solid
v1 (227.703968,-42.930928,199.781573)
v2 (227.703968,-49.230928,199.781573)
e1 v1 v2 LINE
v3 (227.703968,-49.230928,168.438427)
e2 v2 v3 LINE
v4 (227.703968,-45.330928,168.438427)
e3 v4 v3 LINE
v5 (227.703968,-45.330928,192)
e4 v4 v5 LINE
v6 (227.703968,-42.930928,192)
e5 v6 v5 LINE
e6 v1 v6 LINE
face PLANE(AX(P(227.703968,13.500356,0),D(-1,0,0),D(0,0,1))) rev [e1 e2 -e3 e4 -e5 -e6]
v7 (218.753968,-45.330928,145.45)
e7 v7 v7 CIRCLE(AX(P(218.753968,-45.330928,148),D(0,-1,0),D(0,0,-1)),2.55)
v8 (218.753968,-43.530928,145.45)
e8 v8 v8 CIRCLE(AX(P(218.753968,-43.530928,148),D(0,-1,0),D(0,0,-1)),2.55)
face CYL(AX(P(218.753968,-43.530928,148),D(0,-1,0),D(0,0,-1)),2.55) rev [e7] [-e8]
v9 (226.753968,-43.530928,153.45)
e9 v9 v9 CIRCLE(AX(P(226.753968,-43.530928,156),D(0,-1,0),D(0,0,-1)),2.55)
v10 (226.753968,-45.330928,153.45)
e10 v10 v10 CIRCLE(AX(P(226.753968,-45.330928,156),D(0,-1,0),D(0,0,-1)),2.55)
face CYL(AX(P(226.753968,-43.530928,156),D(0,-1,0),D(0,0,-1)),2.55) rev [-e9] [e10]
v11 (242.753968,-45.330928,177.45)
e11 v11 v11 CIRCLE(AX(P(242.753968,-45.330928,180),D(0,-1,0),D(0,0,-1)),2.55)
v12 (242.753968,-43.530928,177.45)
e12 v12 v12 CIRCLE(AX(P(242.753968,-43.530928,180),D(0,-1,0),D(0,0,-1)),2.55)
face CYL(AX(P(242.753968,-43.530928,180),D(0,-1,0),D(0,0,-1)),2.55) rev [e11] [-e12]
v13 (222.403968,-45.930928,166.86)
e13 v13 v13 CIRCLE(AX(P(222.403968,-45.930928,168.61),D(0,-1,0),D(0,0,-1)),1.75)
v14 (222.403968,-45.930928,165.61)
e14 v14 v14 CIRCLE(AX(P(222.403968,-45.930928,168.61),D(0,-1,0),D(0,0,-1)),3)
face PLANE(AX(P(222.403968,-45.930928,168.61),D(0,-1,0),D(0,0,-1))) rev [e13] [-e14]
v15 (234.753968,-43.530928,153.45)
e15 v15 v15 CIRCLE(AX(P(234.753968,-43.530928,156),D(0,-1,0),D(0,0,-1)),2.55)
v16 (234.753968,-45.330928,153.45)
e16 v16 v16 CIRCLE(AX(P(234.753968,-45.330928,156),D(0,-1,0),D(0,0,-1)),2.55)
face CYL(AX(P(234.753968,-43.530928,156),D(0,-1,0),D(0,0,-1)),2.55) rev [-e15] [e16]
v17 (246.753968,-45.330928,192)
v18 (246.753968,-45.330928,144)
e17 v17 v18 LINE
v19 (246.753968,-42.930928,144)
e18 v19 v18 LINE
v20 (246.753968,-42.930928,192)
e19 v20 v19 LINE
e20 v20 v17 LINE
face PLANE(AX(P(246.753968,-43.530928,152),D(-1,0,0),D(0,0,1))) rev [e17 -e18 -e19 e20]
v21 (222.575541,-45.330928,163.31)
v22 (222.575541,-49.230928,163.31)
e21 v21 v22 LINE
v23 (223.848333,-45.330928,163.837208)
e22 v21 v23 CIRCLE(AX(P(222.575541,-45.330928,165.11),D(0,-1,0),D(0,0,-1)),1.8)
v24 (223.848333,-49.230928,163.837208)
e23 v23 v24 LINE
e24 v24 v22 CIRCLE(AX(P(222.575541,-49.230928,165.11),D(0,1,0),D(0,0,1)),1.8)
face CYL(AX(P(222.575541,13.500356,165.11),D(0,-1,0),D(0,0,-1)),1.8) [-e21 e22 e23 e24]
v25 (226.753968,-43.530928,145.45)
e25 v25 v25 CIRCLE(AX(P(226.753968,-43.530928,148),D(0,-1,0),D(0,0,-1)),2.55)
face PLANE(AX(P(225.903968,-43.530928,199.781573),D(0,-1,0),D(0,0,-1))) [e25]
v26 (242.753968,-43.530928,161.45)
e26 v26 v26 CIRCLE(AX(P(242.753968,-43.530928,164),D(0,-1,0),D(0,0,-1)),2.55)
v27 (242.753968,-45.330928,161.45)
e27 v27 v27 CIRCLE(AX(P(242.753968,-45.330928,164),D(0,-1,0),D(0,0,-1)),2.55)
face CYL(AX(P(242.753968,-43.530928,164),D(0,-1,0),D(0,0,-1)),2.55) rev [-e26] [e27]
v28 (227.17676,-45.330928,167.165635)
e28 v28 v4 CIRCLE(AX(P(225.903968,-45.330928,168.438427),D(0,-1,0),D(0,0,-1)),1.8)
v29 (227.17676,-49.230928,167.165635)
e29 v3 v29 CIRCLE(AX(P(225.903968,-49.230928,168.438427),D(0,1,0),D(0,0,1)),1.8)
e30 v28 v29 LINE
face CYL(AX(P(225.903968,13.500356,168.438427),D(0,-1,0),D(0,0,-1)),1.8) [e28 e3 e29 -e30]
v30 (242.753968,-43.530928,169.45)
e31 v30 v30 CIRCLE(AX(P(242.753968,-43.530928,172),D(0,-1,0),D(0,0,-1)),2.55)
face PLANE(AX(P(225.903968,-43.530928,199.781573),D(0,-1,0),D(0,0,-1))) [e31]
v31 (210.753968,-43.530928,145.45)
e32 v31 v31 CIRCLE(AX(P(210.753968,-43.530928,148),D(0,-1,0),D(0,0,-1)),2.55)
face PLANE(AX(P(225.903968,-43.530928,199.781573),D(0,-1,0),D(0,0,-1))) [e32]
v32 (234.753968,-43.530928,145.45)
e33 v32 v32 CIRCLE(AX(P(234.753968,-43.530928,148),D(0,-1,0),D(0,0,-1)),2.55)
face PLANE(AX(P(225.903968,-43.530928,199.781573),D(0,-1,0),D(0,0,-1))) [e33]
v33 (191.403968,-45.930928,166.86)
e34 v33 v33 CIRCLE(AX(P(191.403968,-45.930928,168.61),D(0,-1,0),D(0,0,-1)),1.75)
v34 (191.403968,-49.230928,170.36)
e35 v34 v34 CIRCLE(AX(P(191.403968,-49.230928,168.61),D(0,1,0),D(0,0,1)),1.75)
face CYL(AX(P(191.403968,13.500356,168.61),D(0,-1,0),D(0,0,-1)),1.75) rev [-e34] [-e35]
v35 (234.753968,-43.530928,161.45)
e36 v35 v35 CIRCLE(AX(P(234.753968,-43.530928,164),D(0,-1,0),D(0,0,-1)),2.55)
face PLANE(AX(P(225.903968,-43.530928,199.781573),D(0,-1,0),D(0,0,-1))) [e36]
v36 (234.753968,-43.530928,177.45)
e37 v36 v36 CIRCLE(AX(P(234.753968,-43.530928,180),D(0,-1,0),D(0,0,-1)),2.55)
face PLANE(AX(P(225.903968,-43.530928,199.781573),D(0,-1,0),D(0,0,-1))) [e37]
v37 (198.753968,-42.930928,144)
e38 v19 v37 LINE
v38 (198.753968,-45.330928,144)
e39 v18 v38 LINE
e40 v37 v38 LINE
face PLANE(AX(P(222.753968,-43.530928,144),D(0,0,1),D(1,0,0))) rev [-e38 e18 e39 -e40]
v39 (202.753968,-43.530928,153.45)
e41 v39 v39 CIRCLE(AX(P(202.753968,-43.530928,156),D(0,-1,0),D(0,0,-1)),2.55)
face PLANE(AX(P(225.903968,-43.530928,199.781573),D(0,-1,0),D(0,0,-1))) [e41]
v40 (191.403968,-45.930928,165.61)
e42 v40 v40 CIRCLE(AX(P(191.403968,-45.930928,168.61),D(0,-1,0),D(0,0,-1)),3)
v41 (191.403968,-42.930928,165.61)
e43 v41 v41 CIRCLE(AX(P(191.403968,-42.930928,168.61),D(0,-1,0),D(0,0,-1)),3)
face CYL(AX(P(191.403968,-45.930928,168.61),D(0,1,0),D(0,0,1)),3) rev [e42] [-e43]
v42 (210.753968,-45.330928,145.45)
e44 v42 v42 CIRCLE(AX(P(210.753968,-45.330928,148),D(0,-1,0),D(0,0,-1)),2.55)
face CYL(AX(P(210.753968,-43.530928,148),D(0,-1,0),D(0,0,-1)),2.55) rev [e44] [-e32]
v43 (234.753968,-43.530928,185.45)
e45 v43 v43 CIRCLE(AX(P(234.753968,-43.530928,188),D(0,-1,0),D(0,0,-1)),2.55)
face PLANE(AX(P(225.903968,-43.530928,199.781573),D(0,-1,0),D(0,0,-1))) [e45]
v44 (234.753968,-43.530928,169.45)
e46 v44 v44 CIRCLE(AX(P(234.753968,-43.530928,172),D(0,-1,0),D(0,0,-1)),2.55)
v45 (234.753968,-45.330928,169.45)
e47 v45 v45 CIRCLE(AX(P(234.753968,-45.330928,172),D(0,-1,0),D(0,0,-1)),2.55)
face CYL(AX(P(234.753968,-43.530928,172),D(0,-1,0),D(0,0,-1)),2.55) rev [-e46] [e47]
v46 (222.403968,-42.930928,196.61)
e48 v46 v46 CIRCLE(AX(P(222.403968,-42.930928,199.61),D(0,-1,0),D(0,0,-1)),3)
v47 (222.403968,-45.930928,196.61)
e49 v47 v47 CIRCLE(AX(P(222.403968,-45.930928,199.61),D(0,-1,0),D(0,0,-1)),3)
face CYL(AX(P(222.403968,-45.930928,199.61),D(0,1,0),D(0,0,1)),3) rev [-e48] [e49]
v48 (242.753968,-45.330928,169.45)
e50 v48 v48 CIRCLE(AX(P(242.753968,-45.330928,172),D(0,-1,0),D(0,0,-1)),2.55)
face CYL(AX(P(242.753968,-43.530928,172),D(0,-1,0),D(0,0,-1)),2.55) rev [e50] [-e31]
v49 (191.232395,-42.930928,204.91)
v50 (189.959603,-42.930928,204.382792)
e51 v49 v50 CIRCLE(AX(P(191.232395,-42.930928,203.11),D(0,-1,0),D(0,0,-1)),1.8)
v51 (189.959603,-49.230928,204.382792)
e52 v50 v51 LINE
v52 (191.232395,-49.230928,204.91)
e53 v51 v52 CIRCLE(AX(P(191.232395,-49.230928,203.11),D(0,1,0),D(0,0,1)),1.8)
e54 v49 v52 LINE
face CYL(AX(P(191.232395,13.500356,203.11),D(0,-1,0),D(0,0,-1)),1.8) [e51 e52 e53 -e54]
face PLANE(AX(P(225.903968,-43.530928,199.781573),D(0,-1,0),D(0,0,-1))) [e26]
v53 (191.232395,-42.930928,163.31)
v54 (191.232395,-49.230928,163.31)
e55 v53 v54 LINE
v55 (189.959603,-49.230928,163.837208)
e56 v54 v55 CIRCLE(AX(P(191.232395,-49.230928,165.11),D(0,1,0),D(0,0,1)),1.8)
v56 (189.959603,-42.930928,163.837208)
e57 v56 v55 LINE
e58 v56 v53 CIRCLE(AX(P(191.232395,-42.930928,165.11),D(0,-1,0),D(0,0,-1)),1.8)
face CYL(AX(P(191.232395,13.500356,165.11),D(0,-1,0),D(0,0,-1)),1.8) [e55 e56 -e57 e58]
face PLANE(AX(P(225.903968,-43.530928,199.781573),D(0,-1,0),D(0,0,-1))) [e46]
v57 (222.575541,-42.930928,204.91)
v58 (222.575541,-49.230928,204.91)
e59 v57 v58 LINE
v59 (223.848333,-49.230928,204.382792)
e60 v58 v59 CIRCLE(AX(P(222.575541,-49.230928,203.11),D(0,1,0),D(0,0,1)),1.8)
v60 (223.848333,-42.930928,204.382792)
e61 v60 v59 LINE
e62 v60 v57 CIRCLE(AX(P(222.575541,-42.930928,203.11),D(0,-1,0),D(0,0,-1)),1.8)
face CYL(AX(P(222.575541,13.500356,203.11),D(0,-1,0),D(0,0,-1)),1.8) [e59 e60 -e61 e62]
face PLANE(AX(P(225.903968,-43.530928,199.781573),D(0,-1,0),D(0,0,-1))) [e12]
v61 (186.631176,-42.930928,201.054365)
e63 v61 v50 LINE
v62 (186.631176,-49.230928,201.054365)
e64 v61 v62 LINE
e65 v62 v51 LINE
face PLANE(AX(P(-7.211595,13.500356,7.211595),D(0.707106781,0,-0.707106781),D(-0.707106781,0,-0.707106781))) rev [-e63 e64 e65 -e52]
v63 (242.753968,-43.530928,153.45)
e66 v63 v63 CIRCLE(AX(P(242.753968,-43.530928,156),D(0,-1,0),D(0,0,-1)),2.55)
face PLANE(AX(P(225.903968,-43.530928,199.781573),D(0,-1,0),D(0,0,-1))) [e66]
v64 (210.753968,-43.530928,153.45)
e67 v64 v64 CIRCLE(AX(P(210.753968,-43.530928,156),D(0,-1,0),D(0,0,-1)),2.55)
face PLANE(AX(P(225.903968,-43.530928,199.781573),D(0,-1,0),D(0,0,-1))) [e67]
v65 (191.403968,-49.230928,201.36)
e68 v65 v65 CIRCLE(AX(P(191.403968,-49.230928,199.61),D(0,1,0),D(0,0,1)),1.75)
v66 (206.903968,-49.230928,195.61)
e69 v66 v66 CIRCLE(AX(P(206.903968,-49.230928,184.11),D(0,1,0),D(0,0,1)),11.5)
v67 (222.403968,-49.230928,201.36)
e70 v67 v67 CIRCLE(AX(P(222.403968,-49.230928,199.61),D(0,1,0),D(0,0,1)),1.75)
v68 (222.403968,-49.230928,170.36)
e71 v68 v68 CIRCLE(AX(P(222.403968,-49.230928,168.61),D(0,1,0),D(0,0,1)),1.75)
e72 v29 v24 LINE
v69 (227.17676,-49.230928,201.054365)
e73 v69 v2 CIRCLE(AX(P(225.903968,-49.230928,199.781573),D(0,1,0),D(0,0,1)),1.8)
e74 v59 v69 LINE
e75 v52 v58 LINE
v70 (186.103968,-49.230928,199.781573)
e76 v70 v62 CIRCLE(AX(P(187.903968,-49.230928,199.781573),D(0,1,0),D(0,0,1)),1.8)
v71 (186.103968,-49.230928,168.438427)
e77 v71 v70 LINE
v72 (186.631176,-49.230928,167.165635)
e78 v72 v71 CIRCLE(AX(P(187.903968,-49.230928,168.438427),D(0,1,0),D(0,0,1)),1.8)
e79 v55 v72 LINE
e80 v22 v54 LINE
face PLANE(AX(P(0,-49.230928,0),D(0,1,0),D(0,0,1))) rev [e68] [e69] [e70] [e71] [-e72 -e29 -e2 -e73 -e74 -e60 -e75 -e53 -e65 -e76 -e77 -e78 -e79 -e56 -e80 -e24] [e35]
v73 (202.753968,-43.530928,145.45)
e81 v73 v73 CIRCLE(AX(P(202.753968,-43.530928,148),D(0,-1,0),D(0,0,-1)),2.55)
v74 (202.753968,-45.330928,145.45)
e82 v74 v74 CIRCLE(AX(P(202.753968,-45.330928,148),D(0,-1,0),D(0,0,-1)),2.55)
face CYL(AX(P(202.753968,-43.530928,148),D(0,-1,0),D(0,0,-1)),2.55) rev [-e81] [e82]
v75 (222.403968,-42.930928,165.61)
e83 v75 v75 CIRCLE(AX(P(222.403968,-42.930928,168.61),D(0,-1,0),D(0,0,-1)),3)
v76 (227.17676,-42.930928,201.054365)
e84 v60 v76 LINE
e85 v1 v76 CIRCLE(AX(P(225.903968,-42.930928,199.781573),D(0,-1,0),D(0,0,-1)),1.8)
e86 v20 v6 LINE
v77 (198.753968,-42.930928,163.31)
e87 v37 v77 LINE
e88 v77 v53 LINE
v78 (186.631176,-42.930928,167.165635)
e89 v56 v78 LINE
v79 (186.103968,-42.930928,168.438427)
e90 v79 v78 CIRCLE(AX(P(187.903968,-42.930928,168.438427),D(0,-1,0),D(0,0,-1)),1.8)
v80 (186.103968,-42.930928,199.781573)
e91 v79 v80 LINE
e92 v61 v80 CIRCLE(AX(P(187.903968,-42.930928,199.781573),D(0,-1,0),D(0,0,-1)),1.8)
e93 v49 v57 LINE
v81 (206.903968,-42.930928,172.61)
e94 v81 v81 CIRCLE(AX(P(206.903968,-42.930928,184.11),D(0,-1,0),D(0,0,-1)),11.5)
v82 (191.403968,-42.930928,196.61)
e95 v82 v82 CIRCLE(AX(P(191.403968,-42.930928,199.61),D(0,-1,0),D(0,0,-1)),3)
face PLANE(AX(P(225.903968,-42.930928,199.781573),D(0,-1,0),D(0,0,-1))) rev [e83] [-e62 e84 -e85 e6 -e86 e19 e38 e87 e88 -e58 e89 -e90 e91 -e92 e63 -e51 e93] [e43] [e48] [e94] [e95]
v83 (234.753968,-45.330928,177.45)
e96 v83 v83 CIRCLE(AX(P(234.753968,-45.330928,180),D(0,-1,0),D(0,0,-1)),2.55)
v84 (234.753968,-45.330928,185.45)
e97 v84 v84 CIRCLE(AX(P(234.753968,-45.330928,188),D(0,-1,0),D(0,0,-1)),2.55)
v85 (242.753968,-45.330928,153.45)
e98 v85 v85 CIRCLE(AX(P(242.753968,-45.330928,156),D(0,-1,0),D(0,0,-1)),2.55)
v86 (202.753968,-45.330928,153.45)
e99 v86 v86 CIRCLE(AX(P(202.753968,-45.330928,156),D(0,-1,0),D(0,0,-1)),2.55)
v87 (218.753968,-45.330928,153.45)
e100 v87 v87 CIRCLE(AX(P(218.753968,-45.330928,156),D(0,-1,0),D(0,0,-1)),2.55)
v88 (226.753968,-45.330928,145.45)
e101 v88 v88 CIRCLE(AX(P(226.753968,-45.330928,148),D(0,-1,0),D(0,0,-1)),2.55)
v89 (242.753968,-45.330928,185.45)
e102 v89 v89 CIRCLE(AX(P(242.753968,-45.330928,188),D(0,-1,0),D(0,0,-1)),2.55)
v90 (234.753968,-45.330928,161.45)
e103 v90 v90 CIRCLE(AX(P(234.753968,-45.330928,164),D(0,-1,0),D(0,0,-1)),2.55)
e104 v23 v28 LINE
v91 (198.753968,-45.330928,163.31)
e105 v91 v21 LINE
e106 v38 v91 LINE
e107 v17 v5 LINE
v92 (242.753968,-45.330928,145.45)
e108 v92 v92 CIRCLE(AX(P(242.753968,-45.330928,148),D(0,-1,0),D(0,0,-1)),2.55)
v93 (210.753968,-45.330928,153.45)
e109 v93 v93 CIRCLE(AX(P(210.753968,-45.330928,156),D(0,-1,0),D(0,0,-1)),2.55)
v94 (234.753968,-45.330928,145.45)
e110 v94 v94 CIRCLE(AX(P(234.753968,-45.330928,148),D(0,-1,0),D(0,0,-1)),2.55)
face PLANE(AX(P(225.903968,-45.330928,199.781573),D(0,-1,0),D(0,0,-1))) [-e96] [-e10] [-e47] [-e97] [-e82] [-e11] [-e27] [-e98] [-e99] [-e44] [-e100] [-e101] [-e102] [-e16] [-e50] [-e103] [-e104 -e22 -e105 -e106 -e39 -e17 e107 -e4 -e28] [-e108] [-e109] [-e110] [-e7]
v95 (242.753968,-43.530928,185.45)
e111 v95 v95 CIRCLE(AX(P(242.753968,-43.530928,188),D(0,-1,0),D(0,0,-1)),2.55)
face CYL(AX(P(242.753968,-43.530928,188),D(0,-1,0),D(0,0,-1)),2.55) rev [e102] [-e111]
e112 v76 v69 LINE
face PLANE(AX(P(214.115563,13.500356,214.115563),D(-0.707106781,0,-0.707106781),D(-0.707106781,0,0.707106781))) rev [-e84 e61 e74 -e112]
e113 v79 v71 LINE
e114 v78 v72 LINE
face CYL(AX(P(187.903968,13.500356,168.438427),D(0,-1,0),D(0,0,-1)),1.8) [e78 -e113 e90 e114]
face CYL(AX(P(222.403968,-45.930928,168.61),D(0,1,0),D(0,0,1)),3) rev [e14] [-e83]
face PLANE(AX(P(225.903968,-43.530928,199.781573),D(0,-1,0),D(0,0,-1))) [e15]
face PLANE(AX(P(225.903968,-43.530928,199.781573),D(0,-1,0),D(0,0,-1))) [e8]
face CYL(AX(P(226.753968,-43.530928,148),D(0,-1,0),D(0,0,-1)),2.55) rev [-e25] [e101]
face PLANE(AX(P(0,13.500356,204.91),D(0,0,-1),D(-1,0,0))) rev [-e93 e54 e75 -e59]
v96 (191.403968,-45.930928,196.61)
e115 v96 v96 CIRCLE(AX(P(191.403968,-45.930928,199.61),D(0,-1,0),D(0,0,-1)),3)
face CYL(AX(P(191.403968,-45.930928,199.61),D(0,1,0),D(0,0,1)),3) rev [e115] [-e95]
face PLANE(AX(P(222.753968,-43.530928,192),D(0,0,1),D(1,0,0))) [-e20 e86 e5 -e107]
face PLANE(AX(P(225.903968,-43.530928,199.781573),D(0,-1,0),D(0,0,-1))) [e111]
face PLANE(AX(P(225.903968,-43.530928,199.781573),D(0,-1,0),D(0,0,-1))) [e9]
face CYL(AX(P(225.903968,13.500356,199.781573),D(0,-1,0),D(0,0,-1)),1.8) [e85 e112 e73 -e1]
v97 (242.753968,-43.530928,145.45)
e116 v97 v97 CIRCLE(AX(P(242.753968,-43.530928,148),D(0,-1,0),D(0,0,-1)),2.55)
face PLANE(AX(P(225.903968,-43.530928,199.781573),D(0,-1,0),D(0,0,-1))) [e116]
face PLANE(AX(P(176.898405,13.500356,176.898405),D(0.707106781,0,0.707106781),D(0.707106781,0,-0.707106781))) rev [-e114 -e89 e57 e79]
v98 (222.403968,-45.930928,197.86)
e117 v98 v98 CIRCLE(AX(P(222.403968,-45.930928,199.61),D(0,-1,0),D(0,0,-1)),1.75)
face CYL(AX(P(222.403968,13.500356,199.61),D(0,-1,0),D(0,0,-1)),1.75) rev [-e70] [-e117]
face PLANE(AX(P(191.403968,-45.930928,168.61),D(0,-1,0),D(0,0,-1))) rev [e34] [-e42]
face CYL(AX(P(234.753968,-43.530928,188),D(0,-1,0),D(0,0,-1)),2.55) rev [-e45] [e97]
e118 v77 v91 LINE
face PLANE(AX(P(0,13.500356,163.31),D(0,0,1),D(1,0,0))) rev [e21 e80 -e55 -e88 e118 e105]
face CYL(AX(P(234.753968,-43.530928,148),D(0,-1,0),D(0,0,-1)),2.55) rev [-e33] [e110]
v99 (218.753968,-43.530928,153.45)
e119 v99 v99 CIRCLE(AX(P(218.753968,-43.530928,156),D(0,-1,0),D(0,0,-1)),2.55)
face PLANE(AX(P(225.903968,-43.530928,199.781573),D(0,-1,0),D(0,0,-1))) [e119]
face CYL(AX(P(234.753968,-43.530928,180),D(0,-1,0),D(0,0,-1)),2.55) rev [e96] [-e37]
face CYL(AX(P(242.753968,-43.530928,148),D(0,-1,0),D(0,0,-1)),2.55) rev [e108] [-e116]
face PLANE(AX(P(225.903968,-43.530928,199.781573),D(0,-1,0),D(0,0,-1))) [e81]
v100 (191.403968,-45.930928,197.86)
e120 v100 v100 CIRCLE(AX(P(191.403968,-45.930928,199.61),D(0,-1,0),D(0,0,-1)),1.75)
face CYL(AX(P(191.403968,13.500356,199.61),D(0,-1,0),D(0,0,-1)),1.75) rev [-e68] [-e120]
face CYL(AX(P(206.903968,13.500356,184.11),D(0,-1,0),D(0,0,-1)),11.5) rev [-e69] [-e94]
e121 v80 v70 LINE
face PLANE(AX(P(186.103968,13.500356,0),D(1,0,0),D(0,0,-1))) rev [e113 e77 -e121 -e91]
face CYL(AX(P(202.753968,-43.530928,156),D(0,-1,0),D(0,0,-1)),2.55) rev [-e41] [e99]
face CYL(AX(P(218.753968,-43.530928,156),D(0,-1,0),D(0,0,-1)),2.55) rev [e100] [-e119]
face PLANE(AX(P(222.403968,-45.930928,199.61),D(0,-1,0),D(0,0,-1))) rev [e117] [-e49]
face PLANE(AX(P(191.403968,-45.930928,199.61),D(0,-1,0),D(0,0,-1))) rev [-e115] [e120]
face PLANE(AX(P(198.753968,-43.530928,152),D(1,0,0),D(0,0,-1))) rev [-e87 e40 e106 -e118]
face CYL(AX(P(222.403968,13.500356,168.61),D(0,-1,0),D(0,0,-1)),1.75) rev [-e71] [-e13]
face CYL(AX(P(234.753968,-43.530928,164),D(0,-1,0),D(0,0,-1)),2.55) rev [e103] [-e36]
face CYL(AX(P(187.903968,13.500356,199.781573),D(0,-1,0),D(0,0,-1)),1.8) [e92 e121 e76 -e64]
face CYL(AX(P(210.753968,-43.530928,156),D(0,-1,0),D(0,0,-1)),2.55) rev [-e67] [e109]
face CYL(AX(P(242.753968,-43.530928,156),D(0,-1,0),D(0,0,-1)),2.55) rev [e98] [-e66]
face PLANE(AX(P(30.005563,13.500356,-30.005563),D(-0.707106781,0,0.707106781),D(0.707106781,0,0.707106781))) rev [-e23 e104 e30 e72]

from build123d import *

# Parameters (mm, degrees)
SKETCH1_R                 = 3
SKETCH1_R_2               = 11.5
SKETCH1_R_3               = 1.75
BOSS_EXTRUDE1_DEPTH       = 3.9
BOSS_EXTRUDE2_START       = 3.9
SKETCH1_3_R               = 11.5
SKETCH1_3_R_2             = 2.55
SKETCH1_3_R_3             = 1.75
BOSS_EXTRUDE2_DEPTH       = 1.8
BOSS_EXTRUDE3_START       = 5.7
BOSS_EXTRUDE3_OUTLINE_R   = 1.75
BOSS_EXTRUDE3_OUTLINE_R_2 = 11.5
BOSS_EXTRUDE3_DEPTH       = 0.6
CUT_EXTRUDE1_START        = 3.3
SKETCH1_5_R               = 3
SKETCH1_5_R_2             = 1.75
CUT_EXTRUDE1_DEPTH        = 3


# Read off the part's stored shape, not the designer's step: Boss-Extrude3
with BuildPart() as part:
    # Sketch1 → Boss-Extrude1 (new body)
    # profile 1 of 8: a face of its own
    with BuildSketch(Plane(origin=(0, -49.230927878, 0), x_dir=(1, 0, 0), z_dir=(0, 1, 0))):
        with BuildLine():
            ThreePointArc((189.95960286, -204.382792206), (190.543564888, -204.772983159), (191.232395066, -204.91))
            Line((191.232395066, -204.91), (222.575540816, -204.91))
            ThreePointArc((222.575540816, -204.91), (223.264370995, -204.772983159), (223.848333022, -204.382792206))
            Line((223.848333022, -204.382792206), (227.176760147, -201.054365081))
            ThreePointArc((227.176760147, -201.054365081), (227.5669511, -200.470403054), (227.703967941, -199.781572875))
            Line((227.703967941, -199.781572875), (227.703967941, -192))
            Line((227.703967941, -192), (227.703967941, -168.438427125))
            ThreePointArc((227.703967941, -168.438427125), (227.5669511, -167.749596946), (227.176760147, -167.165634919))
            Line((227.176760147, -167.165634919), (223.848333022, -163.837207794))
            ThreePointArc((223.848333022, -163.837207794), (223.264370995, -163.447016841), (222.575540816, -163.31))
            Line((222.575540816, -163.31), (198.753967941, -163.31))
            Line((198.753967941, -163.31), (191.232395066, -163.31))
            ThreePointArc((191.232395066, -163.31), (190.543564888, -163.447016841), (189.95960286, -163.837207794))
            Line((189.95960286, -163.837207794), (186.631175735, -167.165634919))
            ThreePointArc((186.631175735, -167.165634919), (186.240984783, -167.749596946), (186.103967941, -168.438427125))
            Line((186.103967941, -168.438427125), (186.103967941, -199.781572875))
            ThreePointArc((186.103967941, -199.781572875), (186.240984783, -200.470403054), (186.631175735, -201.054365081))
            Line((186.631175735, -201.054365081), (189.95960286, -204.382792206))
        make_face()
        with Locations((191.403967941, -199.61)):
            Circle(SKETCH1_R, mode=Mode.SUBTRACT)
        with Locations(Location((206.903967941, -184.11, 0), (0, 0, 90))):
            Circle(SKETCH1_R_2, mode=Mode.SUBTRACT)
        with Locations((222.403967941, -199.61)):
            Circle(SKETCH1_R, mode=Mode.SUBTRACT)
        with Locations((191.403967941, -168.61)):
            Circle(SKETCH1_R, mode=Mode.SUBTRACT)
        with Locations((222.403967941, -168.61)):
            Circle(SKETCH1_R, mode=Mode.SUBTRACT)
    # profile 2 of 8: a face of its own
    with BuildSketch(Plane(origin=(0, -49.230927878, 0), x_dir=(1, 0, 0), z_dir=(0, 1, 0))):
        with BuildLine():
            ThreePointArc((189.95960286, -204.382792206), (190.543564888, -204.772983159), (191.232395066, -204.91))
            Line((191.232395066, -204.91), (222.575540816, -204.91))
            ThreePointArc((222.575540816, -204.91), (223.264370995, -204.772983159), (223.848333022, -204.382792206))
            Line((223.848333022, -204.382792206), (227.176760147, -201.054365081))
            ThreePointArc((227.176760147, -201.054365081), (227.5669511, -200.470403054), (227.703967941, -199.781572875))
            Line((227.703967941, -199.781572875), (227.703967941, -192))
            Line((227.703967941, -192), (227.703967941, -168.438427125))
            ThreePointArc((227.703967941, -168.438427125), (227.5669511, -167.749596946), (227.176760147, -167.165634919))
            Line((227.176760147, -167.165634919), (223.848333022, -163.837207794))
            ThreePointArc((223.848333022, -163.837207794), (223.264370995, -163.447016841), (222.575540816, -163.31))
            Line((222.575540816, -163.31), (198.753967941, -163.31))
            Line((198.753967941, -163.31), (191.232395066, -163.31))
            ThreePointArc((191.232395066, -163.31), (190.543564888, -163.447016841), (189.95960286, -163.837207794))
            Line((189.95960286, -163.837207794), (186.631175735, -167.165634919))
            ThreePointArc((186.631175735, -167.165634919), (186.240984783, -167.749596946), (186.103967941, -168.438427125))
            Line((186.103967941, -168.438427125), (186.103967941, -199.781572875))
            ThreePointArc((186.103967941, -199.781572875), (186.240984783, -200.470403054), (186.631175735, -201.054365081))
            Line((186.631175735, -201.054365081), (189.95960286, -204.382792206))
        make_face()
        with Locations((191.403967941, -199.61)):
            Circle(SKETCH1_R, mode=Mode.SUBTRACT)
        with Locations(Location((206.903967941, -184.11, 0), (0, 0, 90))):
            Circle(SKETCH1_R_2, mode=Mode.SUBTRACT)
        with Locations((222.403967941, -199.61)):
            Circle(SKETCH1_R, mode=Mode.SUBTRACT)
        with Locations((191.403967941, -168.61)):
            Circle(SKETCH1_R, mode=Mode.SUBTRACT)
        with Locations((222.403967941, -168.61)):
            Circle(SKETCH1_R, mode=Mode.SUBTRACT)
    # profile 3 of 8: a face of its own
    with BuildSketch(Plane(origin=(0, -49.230927878, 0), x_dir=(1, 0, 0), z_dir=(0, 1, 0))):
        with Locations((191.403967941, -168.61)):
            Circle(SKETCH1_R)
        with Locations(Location((191.403967941, -168.61, 0), (0, 0, 90))):
            Circle(SKETCH1_R_3, mode=Mode.SUBTRACT)
    # profile 4 of 8: a face of its own
    with BuildSketch(Plane(origin=(0, -49.230927878, 0), x_dir=(1, 0, 0), z_dir=(0, 1, 0))):
        with Locations((222.403967941, -168.61)):
            Circle(SKETCH1_R)
        with Locations(Location((222.403967941, -168.61, 0), (0, 0, 90))):
            Circle(SKETCH1_R_3, mode=Mode.SUBTRACT)
    # profile 5 of 8: a face of its own
    with BuildSketch(Plane(origin=(0, -49.230927878, 0), x_dir=(1, 0, 0), z_dir=(0, 1, 0))):
        with Locations((222.403967941, -199.61)):
            Circle(SKETCH1_R)
        with Locations(Location((222.403967941, -199.61, 0), (0, 0, 90))):
            Circle(SKETCH1_R_3, mode=Mode.SUBTRACT)
    # profile 6 of 8: a face of its own
    with BuildSketch(Plane(origin=(0, -49.230927878, 0), x_dir=(1, 0, 0), z_dir=(0, 1, 0))):
        with Locations((191.403967941, -199.61)):
            Circle(SKETCH1_R)
        with Locations(Location((191.403967941, -199.61, 0), (0, 0, 90))):
            Circle(SKETCH1_R_3, mode=Mode.SUBTRACT)
    # profile 7 of 8: a face of its own
    with BuildSketch(Plane(origin=(0, -49.230927878, 0), x_dir=(1, 0, 0), z_dir=(0, 1, 0))):
        with Locations((191.403967941, -168.61)):
            Circle(SKETCH1_R)
        with Locations(Location((191.403967941, -168.61, 0), (0, 0, 90))):
            Circle(SKETCH1_R_3, mode=Mode.SUBTRACT)
    # profile 8 of 8: a face of its own
    with BuildSketch(Plane(origin=(0, -49.230927878, 0), x_dir=(1, 0, 0), z_dir=(0, 1, 0))):
        with Locations((222.403967941, -168.61)):
            Circle(SKETCH1_R)
        with Locations(Location((222.403967941, -168.61, 0), (0, 0, 90))):
            Circle(SKETCH1_R_3, mode=Mode.SUBTRACT)
    extrude(amount=BOSS_EXTRUDE1_DEPTH)

    # Sketch1<3> → Boss-Extrude2 (add)
    with BuildSketch(Plane(origin=(0, -49.230927878, 0), x_dir=(1, 0, 0), z_dir=(0, 1, 0)).offset(BOSS_EXTRUDE2_START)):
        with BuildLine():
            ThreePointArc((189.95960286, -204.382792206), (190.543564888, -204.772983159), (191.232395066, -204.91))
            Line((191.232395066, -204.91), (222.575540816, -204.91))
            ThreePointArc((222.575540816, -204.91), (223.264370995, -204.772983159), (223.848333022, -204.382792206))
            Line((223.848333022, -204.382792206), (227.176760147, -201.054365081))
            ThreePointArc((227.176760147, -201.054365081), (227.5669511, -200.470403054), (227.703967941, -199.781572875))
            Line((227.703967941, -199.781572875), (227.703967941, -192))
            Line((227.703967941, -192), (246.753967941, -192))
            Line((246.753967941, -192), (246.753967941, -144))
            Line((246.753967941, -144), (198.753967941, -144))
            Line((198.753967941, -144), (198.753967941, -163.31))
            Line((198.753967941, -163.31), (191.232395066, -163.31))
            ThreePointArc((191.232395066, -163.31), (190.543564888, -163.447016841), (189.95960286, -163.837207794))
            Line((189.95960286, -163.837207794), (186.631175735, -167.165634919))
            ThreePointArc((186.631175735, -167.165634919), (186.240984783, -167.749596946), (186.103967941, -168.438427125))
            Line((186.103967941, -168.438427125), (186.103967941, -199.781572875))
            ThreePointArc((186.103967941, -199.781572875), (186.240984783, -200.470403054), (186.631175735, -201.054365081))
            Line((186.631175735, -201.054365081), (189.95960286, -204.382792206))
        make_face()
        with Locations(Location((206.903967941, -184.11, 0), (0, 0, 90))):
            Circle(SKETCH1_3_R, mode=Mode.SUBTRACT)
        with Locations(Location((242.753967941, -180, 0), (0, 0, 90))):
            Circle(SKETCH1_3_R_2, mode=Mode.SUBTRACT)
        with Locations(Location((234.753967941, -172, 0), (0, 0, 90))):
            Circle(SKETCH1_3_R_2, mode=Mode.SUBTRACT)
        with Locations(Location((242.753967941, -172, 0), (0, 0, 90))):
            Circle(SKETCH1_3_R_2, mode=Mode.SUBTRACT)
        with Locations(Location((234.753967941, -164, 0), (0, 0, 90))):
            Circle(SKETCH1_3_R_2, mode=Mode.SUBTRACT)
        with Locations(Location((242.753967941, -164, 0), (0, 0, 90))):
            Circle(SKETCH1_3_R_2, mode=Mode.SUBTRACT)
        with Locations(Location((234.753967941, -188, 0), (0, 0, 90))):
            Circle(SKETCH1_3_R_2, mode=Mode.SUBTRACT)
        with Locations(Location((242.753967941, -188, 0), (0, 0, 90))):
            Circle(SKETCH1_3_R_2, mode=Mode.SUBTRACT)
        with Locations(Location((234.753967941, -180, 0), (0, 0, 90))):
            Circle(SKETCH1_3_R_2, mode=Mode.SUBTRACT)
        with Locations(Location((242.753967941, -148, 0), (0, 0, 90))):
            Circle(SKETCH1_3_R_2, mode=Mode.SUBTRACT)
        with Locations(Location((202.753967941, -156, 0), (0, 0, 90))):
            Circle(SKETCH1_3_R_2, mode=Mode.SUBTRACT)
        with Locations(Location((210.753967941, -156, 0), (0, 0, 90))):
            Circle(SKETCH1_3_R_2, mode=Mode.SUBTRACT)
        with Locations(Location((202.753967941, -148, 0), (0, 0, 90))):
            Circle(SKETCH1_3_R_2, mode=Mode.SUBTRACT)
        with Locations(Location((210.753967941, -148, 0), (0, 0, 90))):
            Circle(SKETCH1_3_R_2, mode=Mode.SUBTRACT)
        with Locations(Location((218.753967941, -156, 0), (0, 0, 90))):
            Circle(SKETCH1_3_R_2, mode=Mode.SUBTRACT)
        with Locations(Location((226.753967941, -156, 0), (0, 0, 90))):
            Circle(SKETCH1_3_R_2, mode=Mode.SUBTRACT)
        with Locations(Location((218.753967941, -148, 0), (0, 0, 90))):
            Circle(SKETCH1_3_R_2, mode=Mode.SUBTRACT)
        with Locations(Location((226.753967941, -148, 0), (0, 0, 90))):
            Circle(SKETCH1_3_R_2, mode=Mode.SUBTRACT)
        with Locations(Location((234.753967941, -156, 0), (0, 0, 90))):
            Circle(SKETCH1_3_R_2, mode=Mode.SUBTRACT)
        with Locations(Location((242.753967941, -156, 0), (0, 0, 90))):
            Circle(SKETCH1_3_R_2, mode=Mode.SUBTRACT)
        with Locations(Location((234.753967941, -148, 0), (0, 0, 90))):
            Circle(SKETCH1_3_R_2, mode=Mode.SUBTRACT)
        with Locations(Location((191.403967941, -168.61, 0), (0, 0, 90))):
            Circle(SKETCH1_3_R_3, mode=Mode.SUBTRACT)
        with Locations(Location((191.403967941, -199.61, 0), (0, 0, 90))):
            Circle(SKETCH1_3_R_3, mode=Mode.SUBTRACT)
        with Locations(Location((222.403967941, -199.61, 0), (0, 0, 90))):
            Circle(SKETCH1_3_R_3, mode=Mode.SUBTRACT)
        with Locations(Location((222.403967941, -168.61, 0), (0, 0, 90))):
            Circle(SKETCH1_3_R_3, mode=Mode.SUBTRACT)
    extrude(amount=BOSS_EXTRUDE2_DEPTH)

    # Boss-Extrude3 outline → Boss-Extrude3 (add)
    with BuildSketch(Plane(origin=(0, -49.230927878, 0), x_dir=(1, 0, 0), z_dir=(0, 1, 0)).offset(BOSS_EXTRUDE3_START)):
        with BuildLine():
            ThreePointArc((189.95960286, -204.382792206), (190.543564888, -204.772983159), (191.232395066, -204.91))
            Line((191.232395066, -204.91), (222.575540816, -204.91))
            ThreePointArc((222.575540816, -204.91), (223.264370995, -204.772983159), (223.848333022, -204.382792206))
            Line((223.848333022, -204.382792206), (227.176760147, -201.054365081))
            ThreePointArc((227.176760147, -201.054365081), (227.5669511, -200.470403054), (227.703967941, -199.781572875))
            Line((227.703967941, -199.781572875), (227.703967941, -192))
            Line((227.703967941, -192), (246.753967941, -192))
            Line((246.753967941, -192), (246.753967941, -144))
            Line((246.753967941, -144), (198.753967941, -144))
            Line((198.753967941, -144), (198.753967941, -163.31))
            Line((198.753967941, -163.31), (191.232395066, -163.31))
            ThreePointArc((191.232395066, -163.31), (190.543564888, -163.447016841), (189.95960286, -163.837207794))
            Line((189.95960286, -163.837207794), (186.631175735, -167.165634919))
            ThreePointArc((186.631175735, -167.165634919), (186.240984783, -167.749596947), (186.103967941, -168.438427125))
            Line((186.103967941, -168.438427125), (186.103967941, -199.781572875))
            ThreePointArc((186.103967941, -199.781572875), (186.240984783, -200.470403053), (186.631175735, -201.054365081))
            Line((186.631175735, -201.054365081), (189.95960286, -204.382792206))
        make_face()
        with Locations((191.403967941, -199.61)):
            Circle(BOSS_EXTRUDE3_OUTLINE_R, mode=Mode.SUBTRACT)
        with Locations((206.903967941, -184.11)):
            Circle(BOSS_EXTRUDE3_OUTLINE_R_2, mode=Mode.SUBTRACT)
        with Locations((222.403967941, -199.61)):
            Circle(BOSS_EXTRUDE3_OUTLINE_R, mode=Mode.SUBTRACT)
        with Locations((191.403967941, -168.61)):
            Circle(BOSS_EXTRUDE3_OUTLINE_R, mode=Mode.SUBTRACT)
        with Locations((222.403967941, -168.61)):
            Circle(BOSS_EXTRUDE3_OUTLINE_R, mode=Mode.SUBTRACT)
    extrude(amount=BOSS_EXTRUDE3_DEPTH)

    # Sketch1<5> → Cut-Extrude1 (cut)
    # profile 1 of 4: a face of its own
    with BuildSketch(Plane(origin=(0, -49.230927878, 0), x_dir=(1, 0, 0), z_dir=(0, 1, 0)).offset(CUT_EXTRUDE1_START)):
        with Locations(Location((191.403967941, -168.61, 0), (0, 0, 90))):
            Circle(SKETCH1_5_R)
        with Locations(Location((191.403967941, -168.61, 0), (0, 0, 90))):
            Circle(SKETCH1_5_R_2, mode=Mode.SUBTRACT)
    # profile 2 of 4: a face of its own
    with BuildSketch(Plane(origin=(0, -49.230927878, 0), x_dir=(1, 0, 0), z_dir=(0, 1, 0)).offset(CUT_EXTRUDE1_START)):
        with Locations(Location((222.403967941, -168.61, 0), (0, 0, 90))):
            Circle(SKETCH1_5_R)
        with Locations(Location((222.403967941, -168.61, 0), (0, 0, 90))):
            Circle(SKETCH1_5_R_2, mode=Mode.SUBTRACT)
    # profile 3 of 4: a face of its own
    with BuildSketch(Plane(origin=(0, -49.230927878, 0), x_dir=(1, 0, 0), z_dir=(0, 1, 0)).offset(CUT_EXTRUDE1_START)):
        with Locations(Location((191.403967941, -199.61, 0), (0, 0, 90))):
            Circle(SKETCH1_5_R)
        with Locations(Location((191.403967941, -199.61, 0), (0, 0, 90))):
            Circle(SKETCH1_5_R_2, mode=Mode.SUBTRACT)
    # profile 4 of 4: a face of its own
    with BuildSketch(Plane(origin=(0, -49.230927878, 0), x_dir=(1, 0, 0), z_dir=(0, 1, 0)).offset(CUT_EXTRUDE1_START)):
        with Locations(Location((222.403967941, -199.61, 0), (0, 0, 90))):
            Circle(SKETCH1_5_R)
        with Locations(Location((222.403967941, -199.61, 0), (0, 0, 90))):
            Circle(SKETCH1_5_R_2, mode=Mode.SUBTRACT)
    extrude(amount=CUT_EXTRUDE1_DEPTH, mode=Mode.SUBTRACT)


solid = part.part
